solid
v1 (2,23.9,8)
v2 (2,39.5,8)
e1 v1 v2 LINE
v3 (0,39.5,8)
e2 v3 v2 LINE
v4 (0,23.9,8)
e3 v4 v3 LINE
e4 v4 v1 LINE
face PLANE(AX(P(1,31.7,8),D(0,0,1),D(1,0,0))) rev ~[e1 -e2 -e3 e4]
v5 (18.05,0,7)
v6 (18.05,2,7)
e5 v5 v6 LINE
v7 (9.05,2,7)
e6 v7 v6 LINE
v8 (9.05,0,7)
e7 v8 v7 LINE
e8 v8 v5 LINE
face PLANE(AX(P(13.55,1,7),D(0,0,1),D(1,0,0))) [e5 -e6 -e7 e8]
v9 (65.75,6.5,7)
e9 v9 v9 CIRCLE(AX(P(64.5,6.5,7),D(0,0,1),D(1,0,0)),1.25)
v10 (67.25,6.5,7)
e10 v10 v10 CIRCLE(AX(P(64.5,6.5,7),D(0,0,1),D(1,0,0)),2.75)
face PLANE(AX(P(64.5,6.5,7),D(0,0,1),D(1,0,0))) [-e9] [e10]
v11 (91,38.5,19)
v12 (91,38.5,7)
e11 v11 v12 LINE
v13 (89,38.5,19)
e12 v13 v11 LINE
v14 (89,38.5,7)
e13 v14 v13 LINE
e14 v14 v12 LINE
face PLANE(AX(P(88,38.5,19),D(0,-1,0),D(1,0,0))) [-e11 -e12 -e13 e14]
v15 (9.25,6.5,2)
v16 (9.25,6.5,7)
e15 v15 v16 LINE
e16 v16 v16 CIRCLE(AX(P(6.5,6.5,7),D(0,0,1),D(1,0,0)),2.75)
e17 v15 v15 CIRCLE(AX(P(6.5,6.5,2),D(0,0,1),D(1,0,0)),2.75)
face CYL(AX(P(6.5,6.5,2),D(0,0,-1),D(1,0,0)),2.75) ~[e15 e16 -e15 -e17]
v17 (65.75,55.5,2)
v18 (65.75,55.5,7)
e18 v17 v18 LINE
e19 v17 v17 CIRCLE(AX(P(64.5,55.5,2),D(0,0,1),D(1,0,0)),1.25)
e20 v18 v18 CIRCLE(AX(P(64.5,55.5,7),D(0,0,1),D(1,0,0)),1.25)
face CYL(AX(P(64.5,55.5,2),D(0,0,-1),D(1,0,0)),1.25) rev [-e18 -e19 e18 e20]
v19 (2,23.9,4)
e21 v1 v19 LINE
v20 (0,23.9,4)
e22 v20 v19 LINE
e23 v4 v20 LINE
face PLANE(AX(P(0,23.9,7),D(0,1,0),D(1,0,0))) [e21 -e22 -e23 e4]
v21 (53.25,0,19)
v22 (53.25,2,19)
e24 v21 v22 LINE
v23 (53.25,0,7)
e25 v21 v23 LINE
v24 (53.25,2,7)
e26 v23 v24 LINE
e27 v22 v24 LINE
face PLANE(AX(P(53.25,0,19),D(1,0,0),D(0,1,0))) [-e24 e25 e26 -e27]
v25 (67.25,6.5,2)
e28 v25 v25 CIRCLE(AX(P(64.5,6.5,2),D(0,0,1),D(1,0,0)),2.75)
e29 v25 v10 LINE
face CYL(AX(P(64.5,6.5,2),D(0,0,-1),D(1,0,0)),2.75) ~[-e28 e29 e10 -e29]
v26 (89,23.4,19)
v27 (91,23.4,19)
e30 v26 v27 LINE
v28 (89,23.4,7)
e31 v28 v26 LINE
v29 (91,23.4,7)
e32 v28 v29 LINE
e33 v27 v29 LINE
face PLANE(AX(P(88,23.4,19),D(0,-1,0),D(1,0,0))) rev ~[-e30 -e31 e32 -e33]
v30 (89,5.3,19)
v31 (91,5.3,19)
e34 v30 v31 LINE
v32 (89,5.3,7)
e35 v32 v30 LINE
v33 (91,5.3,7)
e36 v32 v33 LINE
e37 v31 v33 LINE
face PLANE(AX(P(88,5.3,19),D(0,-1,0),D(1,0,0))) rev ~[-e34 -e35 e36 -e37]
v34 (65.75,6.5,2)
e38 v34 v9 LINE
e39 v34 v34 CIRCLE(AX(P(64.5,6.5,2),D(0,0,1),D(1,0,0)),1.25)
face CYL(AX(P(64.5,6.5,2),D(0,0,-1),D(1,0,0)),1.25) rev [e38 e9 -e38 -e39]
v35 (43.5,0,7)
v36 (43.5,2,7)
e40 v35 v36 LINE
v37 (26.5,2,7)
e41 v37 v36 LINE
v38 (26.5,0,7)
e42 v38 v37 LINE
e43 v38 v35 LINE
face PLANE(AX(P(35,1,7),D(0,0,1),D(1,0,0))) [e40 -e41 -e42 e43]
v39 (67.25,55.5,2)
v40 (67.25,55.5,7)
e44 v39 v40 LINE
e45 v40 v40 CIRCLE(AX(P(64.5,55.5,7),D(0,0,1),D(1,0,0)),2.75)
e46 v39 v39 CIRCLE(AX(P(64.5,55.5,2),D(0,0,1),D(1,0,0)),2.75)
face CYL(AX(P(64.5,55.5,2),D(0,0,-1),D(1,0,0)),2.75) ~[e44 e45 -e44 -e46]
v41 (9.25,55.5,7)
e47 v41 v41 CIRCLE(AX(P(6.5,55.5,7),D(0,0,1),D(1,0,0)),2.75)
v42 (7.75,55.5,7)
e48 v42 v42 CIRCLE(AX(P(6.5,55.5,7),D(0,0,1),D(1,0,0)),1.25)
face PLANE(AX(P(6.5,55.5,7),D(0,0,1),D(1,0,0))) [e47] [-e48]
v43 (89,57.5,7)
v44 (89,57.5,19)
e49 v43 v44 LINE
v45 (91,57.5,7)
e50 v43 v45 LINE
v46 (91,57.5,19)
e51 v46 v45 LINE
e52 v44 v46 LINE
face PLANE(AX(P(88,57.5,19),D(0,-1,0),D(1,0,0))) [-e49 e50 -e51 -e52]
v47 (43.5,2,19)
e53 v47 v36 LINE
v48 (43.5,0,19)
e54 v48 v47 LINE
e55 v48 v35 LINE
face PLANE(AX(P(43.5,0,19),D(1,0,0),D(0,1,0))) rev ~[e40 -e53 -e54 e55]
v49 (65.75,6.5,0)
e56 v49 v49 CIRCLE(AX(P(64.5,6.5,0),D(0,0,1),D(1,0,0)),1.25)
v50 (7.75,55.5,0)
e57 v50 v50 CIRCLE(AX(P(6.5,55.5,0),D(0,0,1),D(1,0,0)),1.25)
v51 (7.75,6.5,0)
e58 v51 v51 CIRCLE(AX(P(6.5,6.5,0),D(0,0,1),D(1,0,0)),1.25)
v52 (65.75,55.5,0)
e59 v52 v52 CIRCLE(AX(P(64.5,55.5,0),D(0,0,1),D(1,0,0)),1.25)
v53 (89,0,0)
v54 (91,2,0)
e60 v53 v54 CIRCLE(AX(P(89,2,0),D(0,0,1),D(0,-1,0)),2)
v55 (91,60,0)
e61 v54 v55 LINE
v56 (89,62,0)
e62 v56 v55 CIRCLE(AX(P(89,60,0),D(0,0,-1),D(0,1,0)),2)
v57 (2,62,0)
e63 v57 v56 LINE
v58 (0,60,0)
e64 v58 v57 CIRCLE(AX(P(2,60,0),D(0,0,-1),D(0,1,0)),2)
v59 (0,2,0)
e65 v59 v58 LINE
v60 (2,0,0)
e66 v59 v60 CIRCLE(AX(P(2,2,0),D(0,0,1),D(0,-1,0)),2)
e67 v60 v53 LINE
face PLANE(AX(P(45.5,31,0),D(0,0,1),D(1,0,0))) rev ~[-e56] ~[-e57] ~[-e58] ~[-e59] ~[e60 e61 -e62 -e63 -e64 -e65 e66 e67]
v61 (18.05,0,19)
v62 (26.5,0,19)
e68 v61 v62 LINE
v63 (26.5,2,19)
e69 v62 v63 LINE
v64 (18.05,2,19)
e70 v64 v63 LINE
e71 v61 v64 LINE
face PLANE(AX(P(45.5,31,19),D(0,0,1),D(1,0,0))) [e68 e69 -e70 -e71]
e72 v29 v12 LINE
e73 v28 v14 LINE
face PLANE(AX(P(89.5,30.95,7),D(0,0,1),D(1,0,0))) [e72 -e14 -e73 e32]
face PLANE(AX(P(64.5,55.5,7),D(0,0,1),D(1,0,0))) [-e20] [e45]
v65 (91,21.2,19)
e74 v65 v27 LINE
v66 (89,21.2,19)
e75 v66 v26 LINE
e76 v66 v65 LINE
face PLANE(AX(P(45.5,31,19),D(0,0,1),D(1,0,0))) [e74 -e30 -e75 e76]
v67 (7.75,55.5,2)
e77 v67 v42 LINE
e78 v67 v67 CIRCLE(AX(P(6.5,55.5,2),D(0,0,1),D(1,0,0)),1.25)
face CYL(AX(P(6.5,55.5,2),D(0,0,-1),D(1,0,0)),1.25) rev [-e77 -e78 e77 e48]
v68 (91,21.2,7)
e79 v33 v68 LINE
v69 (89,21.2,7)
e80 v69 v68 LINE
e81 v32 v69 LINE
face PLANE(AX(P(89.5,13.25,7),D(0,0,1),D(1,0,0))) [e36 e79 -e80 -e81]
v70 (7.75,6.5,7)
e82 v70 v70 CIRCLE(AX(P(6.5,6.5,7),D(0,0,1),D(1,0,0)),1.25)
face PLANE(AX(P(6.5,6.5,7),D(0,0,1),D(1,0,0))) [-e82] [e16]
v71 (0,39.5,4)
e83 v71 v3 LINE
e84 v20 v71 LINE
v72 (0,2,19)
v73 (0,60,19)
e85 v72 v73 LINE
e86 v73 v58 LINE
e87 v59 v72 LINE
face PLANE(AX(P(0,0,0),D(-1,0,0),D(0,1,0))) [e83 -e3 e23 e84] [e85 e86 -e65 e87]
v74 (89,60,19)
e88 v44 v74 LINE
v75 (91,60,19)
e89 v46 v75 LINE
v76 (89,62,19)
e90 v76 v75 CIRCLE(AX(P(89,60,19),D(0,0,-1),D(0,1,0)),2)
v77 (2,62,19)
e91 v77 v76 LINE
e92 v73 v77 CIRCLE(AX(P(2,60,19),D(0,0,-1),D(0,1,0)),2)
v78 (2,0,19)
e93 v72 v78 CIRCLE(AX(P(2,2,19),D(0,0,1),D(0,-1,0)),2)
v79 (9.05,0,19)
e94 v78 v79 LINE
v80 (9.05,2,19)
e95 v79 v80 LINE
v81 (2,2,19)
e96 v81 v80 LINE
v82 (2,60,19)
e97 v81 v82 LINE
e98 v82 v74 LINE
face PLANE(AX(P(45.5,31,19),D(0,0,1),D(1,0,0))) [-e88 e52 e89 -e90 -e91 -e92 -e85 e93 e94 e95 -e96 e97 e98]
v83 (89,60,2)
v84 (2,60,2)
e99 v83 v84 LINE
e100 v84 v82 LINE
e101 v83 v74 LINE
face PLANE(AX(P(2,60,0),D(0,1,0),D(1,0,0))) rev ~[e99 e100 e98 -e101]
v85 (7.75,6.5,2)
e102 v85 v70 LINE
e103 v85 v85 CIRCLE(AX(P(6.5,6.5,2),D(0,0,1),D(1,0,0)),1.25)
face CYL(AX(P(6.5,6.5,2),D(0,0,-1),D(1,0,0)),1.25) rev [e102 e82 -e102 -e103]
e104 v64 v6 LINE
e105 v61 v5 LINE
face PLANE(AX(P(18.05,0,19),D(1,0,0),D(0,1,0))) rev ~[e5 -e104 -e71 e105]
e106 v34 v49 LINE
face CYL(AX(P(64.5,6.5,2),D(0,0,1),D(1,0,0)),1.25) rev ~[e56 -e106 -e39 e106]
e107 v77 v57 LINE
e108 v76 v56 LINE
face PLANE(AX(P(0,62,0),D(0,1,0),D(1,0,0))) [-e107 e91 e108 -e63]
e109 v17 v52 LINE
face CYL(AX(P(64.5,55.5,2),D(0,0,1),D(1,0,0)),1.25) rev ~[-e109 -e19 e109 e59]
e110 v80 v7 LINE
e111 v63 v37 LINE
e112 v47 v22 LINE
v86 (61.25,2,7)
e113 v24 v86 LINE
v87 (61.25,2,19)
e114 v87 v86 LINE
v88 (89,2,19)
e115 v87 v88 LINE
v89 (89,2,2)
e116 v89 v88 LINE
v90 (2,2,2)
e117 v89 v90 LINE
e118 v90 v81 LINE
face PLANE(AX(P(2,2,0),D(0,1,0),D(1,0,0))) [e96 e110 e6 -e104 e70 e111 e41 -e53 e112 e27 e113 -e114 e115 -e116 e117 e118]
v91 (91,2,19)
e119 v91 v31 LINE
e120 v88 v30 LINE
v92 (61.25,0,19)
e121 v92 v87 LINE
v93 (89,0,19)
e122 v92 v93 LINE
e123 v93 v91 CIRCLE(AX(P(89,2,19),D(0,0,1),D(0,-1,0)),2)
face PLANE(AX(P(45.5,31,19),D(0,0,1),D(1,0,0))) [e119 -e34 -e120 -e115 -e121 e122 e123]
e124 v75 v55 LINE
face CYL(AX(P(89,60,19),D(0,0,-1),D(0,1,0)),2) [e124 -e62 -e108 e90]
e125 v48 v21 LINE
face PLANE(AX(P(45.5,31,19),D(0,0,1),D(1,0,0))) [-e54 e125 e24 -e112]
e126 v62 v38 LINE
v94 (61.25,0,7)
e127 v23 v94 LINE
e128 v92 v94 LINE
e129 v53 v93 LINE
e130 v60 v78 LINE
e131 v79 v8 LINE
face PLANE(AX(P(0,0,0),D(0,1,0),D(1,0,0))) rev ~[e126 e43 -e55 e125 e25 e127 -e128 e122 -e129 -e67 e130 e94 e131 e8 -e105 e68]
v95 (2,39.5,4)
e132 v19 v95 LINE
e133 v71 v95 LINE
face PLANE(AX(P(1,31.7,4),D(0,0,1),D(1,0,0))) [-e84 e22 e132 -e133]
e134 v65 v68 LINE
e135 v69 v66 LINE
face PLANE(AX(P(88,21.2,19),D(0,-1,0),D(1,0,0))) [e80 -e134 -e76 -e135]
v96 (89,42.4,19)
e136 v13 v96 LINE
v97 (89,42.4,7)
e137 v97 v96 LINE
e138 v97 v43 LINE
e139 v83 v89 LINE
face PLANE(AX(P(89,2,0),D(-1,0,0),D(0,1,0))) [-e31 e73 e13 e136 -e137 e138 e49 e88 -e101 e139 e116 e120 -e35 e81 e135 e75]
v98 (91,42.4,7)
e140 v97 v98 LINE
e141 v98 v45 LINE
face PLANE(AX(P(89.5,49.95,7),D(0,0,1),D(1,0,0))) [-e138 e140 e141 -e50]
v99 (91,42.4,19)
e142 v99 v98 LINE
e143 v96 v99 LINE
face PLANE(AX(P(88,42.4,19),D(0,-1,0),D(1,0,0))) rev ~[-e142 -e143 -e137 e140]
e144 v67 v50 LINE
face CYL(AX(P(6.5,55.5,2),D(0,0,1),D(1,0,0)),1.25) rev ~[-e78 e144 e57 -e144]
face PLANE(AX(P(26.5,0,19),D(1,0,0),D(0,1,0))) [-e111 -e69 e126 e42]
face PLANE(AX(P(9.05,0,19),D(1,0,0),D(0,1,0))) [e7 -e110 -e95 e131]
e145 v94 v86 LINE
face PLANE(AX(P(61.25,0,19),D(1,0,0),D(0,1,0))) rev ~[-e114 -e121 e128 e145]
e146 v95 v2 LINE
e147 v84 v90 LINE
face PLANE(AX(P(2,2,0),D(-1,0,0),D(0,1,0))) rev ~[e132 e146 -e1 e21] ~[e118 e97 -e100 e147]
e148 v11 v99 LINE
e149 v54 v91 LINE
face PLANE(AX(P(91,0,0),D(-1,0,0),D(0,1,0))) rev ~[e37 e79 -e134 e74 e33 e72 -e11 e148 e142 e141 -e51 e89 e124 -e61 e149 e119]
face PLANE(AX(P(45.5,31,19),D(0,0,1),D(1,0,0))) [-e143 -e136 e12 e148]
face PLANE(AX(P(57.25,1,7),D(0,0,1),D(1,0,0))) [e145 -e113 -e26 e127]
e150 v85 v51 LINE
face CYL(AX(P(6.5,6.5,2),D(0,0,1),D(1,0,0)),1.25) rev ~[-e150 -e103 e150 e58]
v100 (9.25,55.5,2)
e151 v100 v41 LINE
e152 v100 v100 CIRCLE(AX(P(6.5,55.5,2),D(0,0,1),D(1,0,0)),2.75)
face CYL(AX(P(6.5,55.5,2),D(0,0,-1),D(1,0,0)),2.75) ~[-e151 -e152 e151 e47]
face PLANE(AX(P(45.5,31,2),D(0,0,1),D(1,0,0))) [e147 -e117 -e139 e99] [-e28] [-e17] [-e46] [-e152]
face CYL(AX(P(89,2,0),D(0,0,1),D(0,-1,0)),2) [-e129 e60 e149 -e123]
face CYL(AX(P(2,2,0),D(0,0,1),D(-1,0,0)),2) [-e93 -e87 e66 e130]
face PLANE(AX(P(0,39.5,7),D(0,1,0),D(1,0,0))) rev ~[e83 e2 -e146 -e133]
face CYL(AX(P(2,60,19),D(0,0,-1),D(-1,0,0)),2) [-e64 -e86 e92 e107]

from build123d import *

# Parameters (mm, degrees)
F0_W           = 91
F0_H           = 62
F0_W_2         = 87
F0_H_2         = 58
F1_DEPTH       = 2
F2_DEPTH       = 19
F3_R           = 2.75
F3_R_2         = 1.25
F4_DEPTH       = 5
F5_DEPTH       = 2.001
F6_W           = 3
F6_H           = 15.1
F6_H_2         = 15.9
F6_W_2         = 9
F6_H_3         = 2
F6_W_3         = 17
F6_W_4         = 8
F7_DEPTH       = 12
F8_R           = 2
F9_W           = 2
F9_H           = 15.6
F10_DEPTH      = 3
F10_DEPTH_BACK = 1


# Not quite as in the source:
# - a feature names something its author has since deleted; it is built from what else it names


with BuildPart() as f1:
    # F0 (on Top) → F1 (new body)
    with BuildSketch(Plane.XY):
        with Locations((45.5, 31)):
            Rectangle(F0_W, F0_H)
        with Locations((45.5, 31)):
            Rectangle(F0_W_2, F0_H_2, mode=Mode.SUBTRACT)
        with Locations((45.5, 31)):
            Rectangle(F0_W_2, F0_H_2)
    extrude(amount=F1_DEPTH)

    # F0 (on Top) → F2 (join)
    with BuildSketch(Plane.XY):
        with Locations((45.5, 31)):
            Rectangle(F0_W, F0_H)
        with Locations((45.5, 31)):
            Rectangle(F0_W_2, F0_H_2, mode=Mode.SUBTRACT)
    extrude(amount=F2_DEPTH)

    # F3 (on face) → F4 (join)
    with BuildSketch(Plane.XY.offset(2)):
        with Locations((6.5, 55.5)):
            Circle(F3_R)
        with Locations((6.5, 55.5)):
            Circle(F3_R_2, mode=Mode.SUBTRACT)
        with Locations((64.5, 55.5)):
            Circle(F3_R)
        with Locations((64.5, 55.5)):
            Circle(F3_R_2, mode=Mode.SUBTRACT)
        with Locations((64.5, 6.5)):
            Circle(F3_R)
        with Locations((64.5, 6.5)):
            Circle(F3_R_2, mode=Mode.SUBTRACT)
        with Locations((6.5, 6.5)):
            Circle(F3_R)
        with Locations((6.5, 6.5)):
            Circle(F3_R_2, mode=Mode.SUBTRACT)
    extrude(amount=F4_DEPTH)

    # F5 (cut, through all): faces of the model
    f5_faces = [f1.faces().sort_by_distance(p)[0] for p in [
        (6.5, 55.5, 2),
        (64.5, 55.5, 2),
        (64.5, 6.5, 2),
        (6.5, 6.5, 2),
    ]]
    extrude(f5_faces, amount=-F5_DEPTH, mode=Mode.SUBTRACT)

    # F6 (on face) → F7 (cut, through all)
    with BuildSketch(Plane.XY.offset(19)):
        with Locations((89.5, 49.95)):
            Rectangle(F6_W, F6_H)
        with Locations((89.5, 30.95)):
            Rectangle(F6_W, F6_H)
        with Locations((89.5, 13.25)):
            Rectangle(F6_W, F6_H_2)
        with Locations((13.55, 1)):
            Rectangle(F6_W_2, F6_H_3)
        with Locations((35, 1)):
            Rectangle(F6_W_3, F6_H_3)
        with Locations((57.25, 1)):
            Rectangle(F6_W_4, F6_H_3)
    extrude(amount=-F7_DEPTH, mode=Mode.SUBTRACT)

    # F8
    f8_edges = [f1.edges().sort_by_distance(p)[0] for p in [
        (91, 0, 9.5),
        (91, 62, 9.5),
        (0, 0, 9.5),
        (0, 62, 9.5),
    ]]
    fillet(f8_edges, radius=F8_R)

    # F9 (on face) → F10 (cut, two sides)
    with BuildSketch(Plane.XY.offset(7)) as f10_sk:
        with Locations((1, 31.7)):
            Rectangle(F9_W, F9_H)
    extrude(amount=-F10_DEPTH, mode=Mode.SUBTRACT)
    extrude(f10_sk.sketch, amount=F10_DEPTH_BACK, mode=Mode.SUBTRACT)


solid = f1.part
